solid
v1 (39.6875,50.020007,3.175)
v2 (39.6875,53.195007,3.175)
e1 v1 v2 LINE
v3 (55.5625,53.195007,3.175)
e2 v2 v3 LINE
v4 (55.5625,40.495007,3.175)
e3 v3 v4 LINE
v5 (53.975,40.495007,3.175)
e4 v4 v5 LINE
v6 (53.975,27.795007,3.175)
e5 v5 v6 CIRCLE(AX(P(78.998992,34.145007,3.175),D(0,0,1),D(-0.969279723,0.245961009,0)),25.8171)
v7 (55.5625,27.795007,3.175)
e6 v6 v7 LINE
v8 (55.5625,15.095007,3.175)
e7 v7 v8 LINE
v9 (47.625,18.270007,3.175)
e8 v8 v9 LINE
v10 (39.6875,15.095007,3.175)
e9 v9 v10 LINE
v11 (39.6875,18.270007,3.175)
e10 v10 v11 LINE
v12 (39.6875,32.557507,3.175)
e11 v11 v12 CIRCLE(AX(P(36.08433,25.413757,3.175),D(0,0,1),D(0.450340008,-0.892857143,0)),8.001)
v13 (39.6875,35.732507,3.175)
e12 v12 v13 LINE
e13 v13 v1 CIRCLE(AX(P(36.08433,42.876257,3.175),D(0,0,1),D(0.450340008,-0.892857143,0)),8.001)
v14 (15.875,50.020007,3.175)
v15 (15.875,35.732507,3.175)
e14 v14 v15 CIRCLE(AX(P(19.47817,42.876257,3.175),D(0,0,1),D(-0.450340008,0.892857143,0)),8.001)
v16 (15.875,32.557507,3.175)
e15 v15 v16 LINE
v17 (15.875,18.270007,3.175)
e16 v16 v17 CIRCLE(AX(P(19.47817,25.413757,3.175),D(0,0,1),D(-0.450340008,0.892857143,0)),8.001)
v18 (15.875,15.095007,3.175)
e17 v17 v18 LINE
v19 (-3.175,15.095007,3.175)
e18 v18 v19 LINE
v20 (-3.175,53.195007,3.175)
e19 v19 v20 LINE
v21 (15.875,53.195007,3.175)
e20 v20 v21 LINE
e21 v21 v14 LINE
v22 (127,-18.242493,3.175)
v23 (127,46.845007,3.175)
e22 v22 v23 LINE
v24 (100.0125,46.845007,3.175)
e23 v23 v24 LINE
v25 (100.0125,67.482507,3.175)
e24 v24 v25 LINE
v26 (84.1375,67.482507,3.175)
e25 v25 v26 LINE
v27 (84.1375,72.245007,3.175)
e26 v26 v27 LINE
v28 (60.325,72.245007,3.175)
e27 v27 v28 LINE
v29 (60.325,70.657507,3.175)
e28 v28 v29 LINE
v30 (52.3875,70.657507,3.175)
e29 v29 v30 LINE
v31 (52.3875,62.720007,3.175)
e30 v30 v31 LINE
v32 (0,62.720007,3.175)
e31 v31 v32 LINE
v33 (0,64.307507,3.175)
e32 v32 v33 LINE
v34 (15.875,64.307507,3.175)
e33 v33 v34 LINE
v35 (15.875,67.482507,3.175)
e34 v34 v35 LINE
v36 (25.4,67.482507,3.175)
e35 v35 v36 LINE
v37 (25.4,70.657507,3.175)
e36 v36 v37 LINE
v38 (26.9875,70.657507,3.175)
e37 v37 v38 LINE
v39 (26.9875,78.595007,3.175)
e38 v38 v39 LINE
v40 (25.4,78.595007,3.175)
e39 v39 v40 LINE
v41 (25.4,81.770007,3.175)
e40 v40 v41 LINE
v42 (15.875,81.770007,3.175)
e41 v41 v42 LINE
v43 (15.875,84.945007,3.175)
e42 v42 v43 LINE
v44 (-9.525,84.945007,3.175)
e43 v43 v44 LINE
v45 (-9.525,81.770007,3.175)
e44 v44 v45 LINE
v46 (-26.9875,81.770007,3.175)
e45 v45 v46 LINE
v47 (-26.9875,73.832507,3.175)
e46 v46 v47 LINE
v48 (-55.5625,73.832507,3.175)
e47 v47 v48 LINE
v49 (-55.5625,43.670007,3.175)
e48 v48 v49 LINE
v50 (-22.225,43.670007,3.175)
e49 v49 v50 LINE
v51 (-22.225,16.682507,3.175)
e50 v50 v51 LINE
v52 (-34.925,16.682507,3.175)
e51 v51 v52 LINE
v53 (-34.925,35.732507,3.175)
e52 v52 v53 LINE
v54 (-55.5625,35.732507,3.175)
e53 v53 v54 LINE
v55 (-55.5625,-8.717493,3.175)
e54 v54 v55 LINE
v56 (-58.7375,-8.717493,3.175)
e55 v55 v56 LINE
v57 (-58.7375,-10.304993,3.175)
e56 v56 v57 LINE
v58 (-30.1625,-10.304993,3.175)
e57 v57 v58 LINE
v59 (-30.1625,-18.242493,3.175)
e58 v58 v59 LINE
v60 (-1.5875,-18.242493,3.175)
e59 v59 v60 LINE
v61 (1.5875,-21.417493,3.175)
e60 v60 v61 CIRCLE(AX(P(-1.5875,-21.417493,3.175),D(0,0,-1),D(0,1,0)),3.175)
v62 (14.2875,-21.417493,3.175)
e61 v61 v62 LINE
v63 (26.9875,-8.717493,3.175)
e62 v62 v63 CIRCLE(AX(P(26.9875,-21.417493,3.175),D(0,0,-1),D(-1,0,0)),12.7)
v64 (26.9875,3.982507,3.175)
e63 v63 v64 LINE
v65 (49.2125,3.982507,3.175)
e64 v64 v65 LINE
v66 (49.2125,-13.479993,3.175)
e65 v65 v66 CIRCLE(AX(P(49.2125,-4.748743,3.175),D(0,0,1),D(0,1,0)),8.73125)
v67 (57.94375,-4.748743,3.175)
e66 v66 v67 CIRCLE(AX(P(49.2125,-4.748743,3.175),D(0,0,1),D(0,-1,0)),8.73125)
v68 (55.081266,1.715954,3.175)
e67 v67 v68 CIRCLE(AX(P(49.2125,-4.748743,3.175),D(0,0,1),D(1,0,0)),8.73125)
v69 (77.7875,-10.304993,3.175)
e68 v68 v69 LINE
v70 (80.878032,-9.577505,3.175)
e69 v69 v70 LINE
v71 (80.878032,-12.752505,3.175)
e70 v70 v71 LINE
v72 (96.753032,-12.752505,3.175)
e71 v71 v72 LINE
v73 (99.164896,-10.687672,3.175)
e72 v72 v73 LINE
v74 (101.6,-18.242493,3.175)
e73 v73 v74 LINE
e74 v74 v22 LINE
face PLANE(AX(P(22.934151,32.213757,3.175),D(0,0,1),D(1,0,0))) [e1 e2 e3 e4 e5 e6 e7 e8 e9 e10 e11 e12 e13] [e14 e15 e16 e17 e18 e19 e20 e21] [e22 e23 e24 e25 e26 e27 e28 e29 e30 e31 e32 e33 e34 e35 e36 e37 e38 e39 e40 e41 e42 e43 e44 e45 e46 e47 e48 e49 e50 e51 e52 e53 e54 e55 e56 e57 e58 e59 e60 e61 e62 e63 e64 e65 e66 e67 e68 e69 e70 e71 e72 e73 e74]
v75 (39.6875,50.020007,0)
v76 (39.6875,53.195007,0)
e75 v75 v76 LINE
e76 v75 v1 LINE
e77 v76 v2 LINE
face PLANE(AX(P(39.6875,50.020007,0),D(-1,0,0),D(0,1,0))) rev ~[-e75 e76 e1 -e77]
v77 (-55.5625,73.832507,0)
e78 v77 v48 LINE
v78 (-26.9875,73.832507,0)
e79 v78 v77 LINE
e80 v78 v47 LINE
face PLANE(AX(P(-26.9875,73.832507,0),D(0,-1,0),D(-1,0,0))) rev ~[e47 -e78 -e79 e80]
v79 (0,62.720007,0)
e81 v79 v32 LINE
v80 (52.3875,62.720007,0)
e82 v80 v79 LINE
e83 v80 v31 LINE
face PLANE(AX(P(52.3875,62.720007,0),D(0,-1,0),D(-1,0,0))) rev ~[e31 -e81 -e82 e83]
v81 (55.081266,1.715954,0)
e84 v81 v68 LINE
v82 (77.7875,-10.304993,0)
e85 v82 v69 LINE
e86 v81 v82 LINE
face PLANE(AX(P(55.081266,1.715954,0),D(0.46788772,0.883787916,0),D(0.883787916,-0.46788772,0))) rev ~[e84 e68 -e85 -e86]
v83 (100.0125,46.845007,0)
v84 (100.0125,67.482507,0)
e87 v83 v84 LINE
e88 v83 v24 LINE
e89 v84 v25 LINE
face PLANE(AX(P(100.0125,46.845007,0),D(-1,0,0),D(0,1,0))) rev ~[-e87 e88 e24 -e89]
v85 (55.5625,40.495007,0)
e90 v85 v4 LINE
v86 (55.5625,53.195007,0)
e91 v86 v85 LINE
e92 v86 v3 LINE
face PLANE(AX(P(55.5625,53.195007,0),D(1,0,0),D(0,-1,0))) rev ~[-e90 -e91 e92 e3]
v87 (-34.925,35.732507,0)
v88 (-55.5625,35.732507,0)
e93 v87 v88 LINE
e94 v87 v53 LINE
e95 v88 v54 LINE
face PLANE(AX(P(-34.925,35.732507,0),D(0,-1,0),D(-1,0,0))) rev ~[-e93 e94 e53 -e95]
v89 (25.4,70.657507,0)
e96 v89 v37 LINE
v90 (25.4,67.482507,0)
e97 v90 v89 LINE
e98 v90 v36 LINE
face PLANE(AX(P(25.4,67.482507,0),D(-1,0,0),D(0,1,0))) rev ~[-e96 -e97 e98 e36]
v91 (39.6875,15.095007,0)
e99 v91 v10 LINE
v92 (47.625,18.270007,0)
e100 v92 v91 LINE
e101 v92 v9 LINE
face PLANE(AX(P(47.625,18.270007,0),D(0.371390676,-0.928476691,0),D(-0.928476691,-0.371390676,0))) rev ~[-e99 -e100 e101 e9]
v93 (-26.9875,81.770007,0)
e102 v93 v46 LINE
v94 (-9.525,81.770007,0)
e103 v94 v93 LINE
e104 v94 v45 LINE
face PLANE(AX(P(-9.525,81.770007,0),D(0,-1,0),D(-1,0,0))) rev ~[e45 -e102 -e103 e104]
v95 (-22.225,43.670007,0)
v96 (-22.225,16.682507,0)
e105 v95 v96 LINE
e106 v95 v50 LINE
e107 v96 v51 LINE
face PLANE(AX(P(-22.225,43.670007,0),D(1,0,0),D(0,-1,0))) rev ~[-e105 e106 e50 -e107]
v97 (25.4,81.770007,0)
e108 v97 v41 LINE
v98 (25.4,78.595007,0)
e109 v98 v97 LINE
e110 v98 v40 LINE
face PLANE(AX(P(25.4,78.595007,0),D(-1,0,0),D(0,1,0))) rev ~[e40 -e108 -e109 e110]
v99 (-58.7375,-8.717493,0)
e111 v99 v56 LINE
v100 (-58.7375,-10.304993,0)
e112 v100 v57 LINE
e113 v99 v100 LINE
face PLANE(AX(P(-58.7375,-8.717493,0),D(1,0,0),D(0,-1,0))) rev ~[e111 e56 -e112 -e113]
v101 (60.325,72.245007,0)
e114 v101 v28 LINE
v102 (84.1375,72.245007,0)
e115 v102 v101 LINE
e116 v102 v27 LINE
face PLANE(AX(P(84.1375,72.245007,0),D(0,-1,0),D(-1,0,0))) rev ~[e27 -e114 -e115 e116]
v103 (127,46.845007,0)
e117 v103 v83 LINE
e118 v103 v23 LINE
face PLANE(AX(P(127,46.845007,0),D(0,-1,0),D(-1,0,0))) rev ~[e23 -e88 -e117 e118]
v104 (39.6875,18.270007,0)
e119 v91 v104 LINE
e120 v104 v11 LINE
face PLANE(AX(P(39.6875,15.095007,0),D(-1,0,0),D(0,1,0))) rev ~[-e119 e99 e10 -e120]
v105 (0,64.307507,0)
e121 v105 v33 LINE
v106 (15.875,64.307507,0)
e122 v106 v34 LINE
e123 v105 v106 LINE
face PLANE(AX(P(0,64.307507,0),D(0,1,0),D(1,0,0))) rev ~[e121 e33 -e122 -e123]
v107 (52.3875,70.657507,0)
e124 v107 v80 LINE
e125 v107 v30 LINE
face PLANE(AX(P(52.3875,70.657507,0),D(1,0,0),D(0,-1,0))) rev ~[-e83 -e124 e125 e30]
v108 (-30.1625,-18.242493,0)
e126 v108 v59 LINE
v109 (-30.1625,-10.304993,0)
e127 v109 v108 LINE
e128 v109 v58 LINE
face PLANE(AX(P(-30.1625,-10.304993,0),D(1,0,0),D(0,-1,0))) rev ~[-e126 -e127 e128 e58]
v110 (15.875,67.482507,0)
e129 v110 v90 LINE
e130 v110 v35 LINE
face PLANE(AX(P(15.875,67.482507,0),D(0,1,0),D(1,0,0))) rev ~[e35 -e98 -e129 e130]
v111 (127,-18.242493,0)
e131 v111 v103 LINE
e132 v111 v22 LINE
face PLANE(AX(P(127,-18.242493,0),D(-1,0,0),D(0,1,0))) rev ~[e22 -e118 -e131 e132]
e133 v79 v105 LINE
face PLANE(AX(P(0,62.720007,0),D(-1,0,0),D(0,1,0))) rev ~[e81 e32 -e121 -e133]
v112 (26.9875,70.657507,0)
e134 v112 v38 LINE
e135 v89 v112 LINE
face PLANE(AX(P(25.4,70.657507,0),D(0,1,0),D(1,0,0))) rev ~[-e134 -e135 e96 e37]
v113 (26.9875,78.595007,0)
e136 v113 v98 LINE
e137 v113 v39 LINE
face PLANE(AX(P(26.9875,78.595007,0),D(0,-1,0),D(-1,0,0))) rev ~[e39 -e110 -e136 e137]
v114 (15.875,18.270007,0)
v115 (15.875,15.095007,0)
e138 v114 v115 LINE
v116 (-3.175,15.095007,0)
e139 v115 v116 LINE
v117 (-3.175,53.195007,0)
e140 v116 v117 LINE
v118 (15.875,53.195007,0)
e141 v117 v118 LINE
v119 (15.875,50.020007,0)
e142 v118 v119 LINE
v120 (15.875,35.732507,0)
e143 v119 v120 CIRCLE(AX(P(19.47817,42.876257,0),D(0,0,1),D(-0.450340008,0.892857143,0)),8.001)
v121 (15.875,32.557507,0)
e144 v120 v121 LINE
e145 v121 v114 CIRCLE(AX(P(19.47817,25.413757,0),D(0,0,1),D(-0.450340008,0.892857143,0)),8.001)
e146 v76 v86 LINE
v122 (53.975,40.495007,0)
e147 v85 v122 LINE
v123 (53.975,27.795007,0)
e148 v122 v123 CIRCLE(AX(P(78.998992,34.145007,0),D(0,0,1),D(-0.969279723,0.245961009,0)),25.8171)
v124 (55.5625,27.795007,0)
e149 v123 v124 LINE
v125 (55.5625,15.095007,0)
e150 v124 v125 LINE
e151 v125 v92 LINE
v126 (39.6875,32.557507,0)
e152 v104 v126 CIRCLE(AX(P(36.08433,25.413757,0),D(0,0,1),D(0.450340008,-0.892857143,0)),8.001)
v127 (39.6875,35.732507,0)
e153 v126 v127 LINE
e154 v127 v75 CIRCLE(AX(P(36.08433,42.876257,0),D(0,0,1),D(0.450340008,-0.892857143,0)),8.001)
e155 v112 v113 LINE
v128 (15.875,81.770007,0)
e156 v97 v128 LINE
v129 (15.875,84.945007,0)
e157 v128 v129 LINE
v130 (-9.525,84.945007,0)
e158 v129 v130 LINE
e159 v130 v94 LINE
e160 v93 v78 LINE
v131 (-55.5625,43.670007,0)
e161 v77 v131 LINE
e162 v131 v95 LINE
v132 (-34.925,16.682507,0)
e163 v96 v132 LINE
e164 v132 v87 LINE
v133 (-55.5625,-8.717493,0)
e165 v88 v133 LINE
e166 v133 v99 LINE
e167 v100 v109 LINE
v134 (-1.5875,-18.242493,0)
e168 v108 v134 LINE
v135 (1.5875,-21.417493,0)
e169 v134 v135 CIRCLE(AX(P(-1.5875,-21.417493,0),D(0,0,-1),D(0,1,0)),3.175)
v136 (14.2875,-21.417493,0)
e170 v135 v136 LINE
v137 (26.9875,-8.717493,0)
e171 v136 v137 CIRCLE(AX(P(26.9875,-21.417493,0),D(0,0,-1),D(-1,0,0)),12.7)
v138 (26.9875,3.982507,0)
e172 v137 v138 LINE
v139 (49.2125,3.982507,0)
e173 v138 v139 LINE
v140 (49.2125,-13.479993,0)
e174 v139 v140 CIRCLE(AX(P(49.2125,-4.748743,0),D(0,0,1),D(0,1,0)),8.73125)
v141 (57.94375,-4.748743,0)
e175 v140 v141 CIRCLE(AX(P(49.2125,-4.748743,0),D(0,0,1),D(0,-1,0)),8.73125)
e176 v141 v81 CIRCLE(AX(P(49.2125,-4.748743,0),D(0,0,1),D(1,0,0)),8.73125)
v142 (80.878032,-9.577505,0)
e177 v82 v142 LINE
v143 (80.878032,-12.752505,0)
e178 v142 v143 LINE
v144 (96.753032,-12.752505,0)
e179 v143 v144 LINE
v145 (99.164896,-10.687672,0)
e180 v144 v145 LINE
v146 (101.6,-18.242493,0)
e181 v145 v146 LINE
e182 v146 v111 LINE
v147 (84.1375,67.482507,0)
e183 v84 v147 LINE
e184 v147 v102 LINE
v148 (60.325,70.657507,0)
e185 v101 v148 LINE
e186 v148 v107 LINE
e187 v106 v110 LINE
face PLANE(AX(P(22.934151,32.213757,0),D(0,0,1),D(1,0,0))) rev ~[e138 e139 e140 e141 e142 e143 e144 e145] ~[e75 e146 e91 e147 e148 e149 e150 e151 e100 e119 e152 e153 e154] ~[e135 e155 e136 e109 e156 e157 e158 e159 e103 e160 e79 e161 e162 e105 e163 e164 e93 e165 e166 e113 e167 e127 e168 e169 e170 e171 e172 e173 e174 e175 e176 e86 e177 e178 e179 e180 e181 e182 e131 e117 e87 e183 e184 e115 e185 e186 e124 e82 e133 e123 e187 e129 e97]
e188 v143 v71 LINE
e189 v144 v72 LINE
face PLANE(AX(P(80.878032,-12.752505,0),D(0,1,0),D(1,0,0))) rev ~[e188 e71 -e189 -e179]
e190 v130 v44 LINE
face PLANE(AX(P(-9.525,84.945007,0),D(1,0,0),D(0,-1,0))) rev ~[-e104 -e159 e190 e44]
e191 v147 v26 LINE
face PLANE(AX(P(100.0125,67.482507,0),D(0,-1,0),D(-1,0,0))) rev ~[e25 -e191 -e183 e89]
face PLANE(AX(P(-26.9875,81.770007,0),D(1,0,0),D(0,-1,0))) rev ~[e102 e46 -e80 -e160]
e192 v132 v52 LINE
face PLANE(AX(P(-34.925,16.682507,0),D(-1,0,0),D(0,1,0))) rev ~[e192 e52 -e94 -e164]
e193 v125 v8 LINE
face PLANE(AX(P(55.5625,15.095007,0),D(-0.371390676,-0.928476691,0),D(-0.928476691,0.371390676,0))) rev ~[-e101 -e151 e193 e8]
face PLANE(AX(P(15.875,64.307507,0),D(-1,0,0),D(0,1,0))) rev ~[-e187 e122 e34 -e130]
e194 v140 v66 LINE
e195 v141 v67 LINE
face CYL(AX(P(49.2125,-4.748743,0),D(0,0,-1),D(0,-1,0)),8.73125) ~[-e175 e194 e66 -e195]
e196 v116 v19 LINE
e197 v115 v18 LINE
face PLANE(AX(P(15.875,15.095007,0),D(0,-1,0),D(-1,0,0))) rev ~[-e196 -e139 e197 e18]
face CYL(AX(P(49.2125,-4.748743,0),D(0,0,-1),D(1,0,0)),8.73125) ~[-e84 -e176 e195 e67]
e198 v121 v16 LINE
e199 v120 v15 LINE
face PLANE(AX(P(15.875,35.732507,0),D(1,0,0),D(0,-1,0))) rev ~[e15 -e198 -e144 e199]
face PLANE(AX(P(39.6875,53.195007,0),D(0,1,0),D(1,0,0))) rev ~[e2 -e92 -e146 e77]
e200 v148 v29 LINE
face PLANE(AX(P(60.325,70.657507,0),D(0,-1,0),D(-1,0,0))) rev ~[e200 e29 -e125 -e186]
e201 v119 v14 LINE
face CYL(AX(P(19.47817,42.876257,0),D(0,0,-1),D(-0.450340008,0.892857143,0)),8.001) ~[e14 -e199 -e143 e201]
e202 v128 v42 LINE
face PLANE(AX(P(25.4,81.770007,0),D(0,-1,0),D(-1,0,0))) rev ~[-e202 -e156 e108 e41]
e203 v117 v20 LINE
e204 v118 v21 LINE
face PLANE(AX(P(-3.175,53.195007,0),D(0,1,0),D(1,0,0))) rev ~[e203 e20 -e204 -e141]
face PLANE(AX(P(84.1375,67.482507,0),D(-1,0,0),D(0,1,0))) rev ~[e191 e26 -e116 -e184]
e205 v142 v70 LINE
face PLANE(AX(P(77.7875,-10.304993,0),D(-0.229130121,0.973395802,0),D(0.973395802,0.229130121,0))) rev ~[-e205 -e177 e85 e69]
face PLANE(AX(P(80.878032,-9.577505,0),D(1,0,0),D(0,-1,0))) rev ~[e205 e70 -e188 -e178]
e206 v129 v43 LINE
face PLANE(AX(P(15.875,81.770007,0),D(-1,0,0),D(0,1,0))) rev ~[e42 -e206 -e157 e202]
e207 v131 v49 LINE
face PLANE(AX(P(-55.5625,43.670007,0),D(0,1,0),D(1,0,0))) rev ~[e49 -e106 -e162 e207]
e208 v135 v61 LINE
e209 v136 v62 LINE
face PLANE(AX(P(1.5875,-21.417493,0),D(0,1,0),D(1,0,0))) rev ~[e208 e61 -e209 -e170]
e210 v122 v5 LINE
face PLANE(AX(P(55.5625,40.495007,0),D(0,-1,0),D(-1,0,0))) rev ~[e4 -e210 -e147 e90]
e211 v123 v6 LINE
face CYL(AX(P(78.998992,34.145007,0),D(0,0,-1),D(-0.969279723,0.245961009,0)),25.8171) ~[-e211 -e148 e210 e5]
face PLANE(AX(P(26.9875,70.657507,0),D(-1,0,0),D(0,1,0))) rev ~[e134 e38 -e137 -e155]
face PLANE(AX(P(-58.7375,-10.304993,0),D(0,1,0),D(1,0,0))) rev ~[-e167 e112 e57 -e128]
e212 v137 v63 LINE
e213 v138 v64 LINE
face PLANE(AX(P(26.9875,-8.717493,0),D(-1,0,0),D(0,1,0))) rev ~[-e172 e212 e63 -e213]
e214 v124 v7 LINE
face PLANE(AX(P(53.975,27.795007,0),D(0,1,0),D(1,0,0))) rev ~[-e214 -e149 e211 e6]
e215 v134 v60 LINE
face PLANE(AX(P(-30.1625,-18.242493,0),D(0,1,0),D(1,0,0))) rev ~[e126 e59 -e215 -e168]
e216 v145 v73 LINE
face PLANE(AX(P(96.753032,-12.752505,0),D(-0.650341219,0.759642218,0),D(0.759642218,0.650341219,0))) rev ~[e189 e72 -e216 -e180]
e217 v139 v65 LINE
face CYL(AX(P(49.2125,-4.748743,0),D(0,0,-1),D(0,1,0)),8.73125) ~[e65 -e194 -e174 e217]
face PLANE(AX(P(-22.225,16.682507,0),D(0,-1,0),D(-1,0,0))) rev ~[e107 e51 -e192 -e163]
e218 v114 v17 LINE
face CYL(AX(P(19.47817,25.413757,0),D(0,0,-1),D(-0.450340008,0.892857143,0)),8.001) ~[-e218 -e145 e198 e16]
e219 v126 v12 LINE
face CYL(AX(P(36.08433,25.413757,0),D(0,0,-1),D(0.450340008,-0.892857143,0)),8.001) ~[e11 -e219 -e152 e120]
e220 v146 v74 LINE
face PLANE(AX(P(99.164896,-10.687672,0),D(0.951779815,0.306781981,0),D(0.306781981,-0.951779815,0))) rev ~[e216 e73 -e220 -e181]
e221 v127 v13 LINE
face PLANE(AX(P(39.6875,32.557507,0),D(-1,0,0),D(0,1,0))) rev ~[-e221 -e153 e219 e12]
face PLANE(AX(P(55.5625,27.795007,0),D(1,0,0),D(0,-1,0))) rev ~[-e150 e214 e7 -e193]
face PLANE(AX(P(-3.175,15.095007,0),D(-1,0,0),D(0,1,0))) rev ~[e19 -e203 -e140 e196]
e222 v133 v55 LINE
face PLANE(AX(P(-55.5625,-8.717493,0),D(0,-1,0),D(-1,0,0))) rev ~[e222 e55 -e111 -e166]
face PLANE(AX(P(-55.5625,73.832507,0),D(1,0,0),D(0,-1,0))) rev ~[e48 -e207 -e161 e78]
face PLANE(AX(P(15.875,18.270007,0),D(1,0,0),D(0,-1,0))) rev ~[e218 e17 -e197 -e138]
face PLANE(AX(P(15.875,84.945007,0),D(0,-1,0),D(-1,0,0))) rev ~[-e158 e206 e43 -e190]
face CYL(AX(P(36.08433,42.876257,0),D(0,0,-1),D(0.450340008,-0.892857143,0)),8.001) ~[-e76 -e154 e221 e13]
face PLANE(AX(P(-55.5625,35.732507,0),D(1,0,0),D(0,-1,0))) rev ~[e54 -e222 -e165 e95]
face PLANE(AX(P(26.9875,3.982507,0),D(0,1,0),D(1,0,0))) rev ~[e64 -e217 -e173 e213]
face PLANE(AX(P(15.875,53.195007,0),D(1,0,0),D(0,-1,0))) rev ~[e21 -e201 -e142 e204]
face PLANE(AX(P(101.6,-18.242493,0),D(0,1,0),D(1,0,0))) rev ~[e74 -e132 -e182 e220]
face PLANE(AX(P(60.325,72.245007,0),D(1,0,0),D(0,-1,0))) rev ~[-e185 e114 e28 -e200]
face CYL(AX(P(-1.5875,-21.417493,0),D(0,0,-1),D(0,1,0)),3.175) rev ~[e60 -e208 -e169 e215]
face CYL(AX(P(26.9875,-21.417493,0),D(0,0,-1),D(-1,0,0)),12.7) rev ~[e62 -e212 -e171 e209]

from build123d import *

# Parameters (mm, degrees)
F1_DEPTH = 3.175


# Not quite as in the source:
# - ends of sketch curves that miss each other by under 0.0002 mm in the source are joined


with BuildPart() as f1:
    # F0 (on Top) → F1 (new body)
    with BuildSketch(Plane.XY):
        with BuildLine():
            Line((-34.925, 35.7325066477), (-55.5625, 35.7325066477))
            Line((-55.5625, 35.7325066477), (-55.5625, -8.7174933523))
            Line((-55.5625, -8.7174933523), (-58.7375, -8.7174933523))
            Line((-58.7375, -8.7174933523), (-58.7375, -10.3049933523))
            Line((-58.7375, -10.3049933523), (-30.1625, -10.3049933523))
            Line((-30.1625, -10.3049933523), (-30.1625, -18.2424933523))
            Line((-30.1625, -18.2424933523), (-1.5875, -18.2424933523))
            ThreePointArc((-1.5875, -18.2424933523), (0.6575640303, -19.172429322), (1.5875, -21.4174933523))
            Line((1.5875, -21.4174933523), (14.2875, -21.4174933523))
            ThreePointArc((14.2875, -21.4174933523), (18.0072438789, -12.4372372312), (26.9875, -8.7174933523))
            Line((26.9875, -8.7174933523), (26.9875, 3.9825066477))
            Line((26.9875, 3.9825066477), (49.2125, 3.9825066477))
            ThreePointArc((49.2125, 3.9825066477), (52.3581189283, 3.3961819464), (55.0812659129, 1.7159541056))
            Line((55.0812659129, 1.7159541056), (77.7875, -10.3049933523))
            Line((77.7875, -10.3049933523), (80.8780316716, -9.5775052173))
            Line((80.8780316716, -9.5775052173), (80.8780316716, -12.7525052173))
            Line((80.8780316716, -12.7525052173), (96.7530316716, -12.7525052173))
            Line((96.7530316716, -12.7525052173), (99.1648957133, -10.6876718476))
            Line((99.1648957133, -10.6876718476), (101.6, -18.2424933523))
            Line((101.6, -18.2424933523), (104.775, -18.2424933523))
            Line((104.775, -18.2424933523), (119.0625, -18.2424933523))
            Line((119.0625, -18.2424933523), (127, -18.2424933523))
            Line((127, -18.2424933523), (127, 46.8450066477))
            Line((127, 46.8450066477), (100.0125, 46.8450066477))
            Line((100.0125, 46.8450066477), (100.0125, 67.4825066477))
            Line((100.0125, 67.4825066477), (84.1375, 67.4825066477))
            Line((84.1375, 67.4825066477), (84.1375, 72.2450066477))
            Line((84.1375, 72.2450066477), (66.675, 72.2450066477))
            Line((66.675, 72.2450066477), (60.325, 72.2450066477))
            Line((60.325, 72.2450066477), (60.325, 70.6575066477))
            Line((60.325, 70.6575066477), (52.3875, 70.6575066477))
            Line((52.3875, 70.6575066477), (52.3875, 62.7200066477))
            Line((52.3875, 62.7200066477), (0, 62.7200066477))
            Line((0, 62.7200066477), (0, 64.3075066477))
            Line((0, 64.3075066477), (15.875, 64.3075066477))
            Line((15.875, 64.3075066477), (15.875, 67.4825066477))
            Line((15.875, 67.4825066477), (25.4, 67.4825066477))
            Line((25.4, 67.4825066477), (25.4, 70.6575066477))
            Line((25.4, 70.6575066477), (26.9875, 70.6575066477))
            Line((26.9875, 70.6575066477), (26.9875, 78.5950066477))
            Line((26.9875, 78.5950066477), (25.4, 78.5950066477))
            Line((25.4, 78.5950066477), (25.4, 81.7700066477))
            Line((25.4, 81.7700066477), (15.875, 81.7700066477))
            Line((15.875, 81.7700066477), (15.875, 84.9450066477))
            Line((15.875, 84.9450066477), (-9.525, 84.9450066477))
            Line((-9.525, 84.9450066477), (-9.525, 81.7700066477))
            Line((-9.525, 81.7700066477), (-26.9875, 81.7700066477))
            Line((-26.9875, 81.7700066477), (-26.9875, 73.8325066477))
            Line((-26.9875, 73.8325066477), (-55.5625, 73.8325066477))
            Line((-55.5625, 73.8325066477), (-55.5625, 43.6700066477))
            Line((-55.5625, 43.6700066477), (-22.225, 43.6700066477))
            Line((-22.225, 43.6700066477), (-22.225, 16.6825066477))
            Line((-22.225, 16.6825066477), (-34.925, 16.6825066477))
            Line((-34.925, 16.6825066477), (-34.925, 35.7325066477))
        make_face()
        Polygon((-3.175, 53.1950066477), (15.875, 53.1950066477), (15.875, 50.0200066477), (15.875, 35.7325066477), (15.875, 32.5575066477), (15.875, 18.2700066477), (15.875, 15.0950066477), (-3.175, 15.0950066477), align=None, mode=Mode.SUBTRACT)
        Polygon((39.6875, 50.0200066477), (39.6875, 53.1950066477), (55.5625, 53.1950066477), (55.5625, 40.4950066477), (55.5625, 27.7950066477), (55.5625, 15.0950066477), (47.625, 18.2700066477), (39.6875, 15.0950066477), (39.6875, 18.2700066477), (39.6875, 32.5575066477), (39.6875, 35.7325066477), align=None, mode=Mode.SUBTRACT)
        with BuildLine():
            Line((15.875, 35.7325066477), (15.875, 50.0200066477))
            ThreePointArc((15.875, 50.0200066477), (11.4771704008, 42.8762566477), (15.875, 35.7325066477))
        make_face()
        with BuildLine():
            Line((15.875, 18.2700066477), (15.875, 32.5575066477))
            ThreePointArc((15.875, 32.5575066477), (11.4771704008, 25.4137566477), (15.875, 18.2700066477))
        make_face()
        with BuildLine():
            ThreePointArc((39.6875, 35.7325066477), (44.0853295992, 42.8762566477), (39.6875, 50.0200066477))
            Line((39.6875, 50.0200066477), (39.6875, 35.7325066477))
        make_face()
        with BuildLine():
            ThreePointArc((39.6875, 18.2700066477), (44.0853295992, 25.4137566477), (39.6875, 32.5575066477))
            Line((39.6875, 32.5575066477), (39.6875, 18.2700066477))
        make_face()
        with BuildLine():
            Line((55.5625, 27.7950066477), (55.5625, 40.4950066477))
            Line((55.5625, 40.4950066477), (53.975, 40.4950066477))
            ThreePointArc((53.975, 40.4950066477), (53.1818915421, 34.1450066477), (53.975, 27.7950066477))
            Line((53.975, 27.7950066477), (55.5625, 27.7950066477))
        make_face()
        with BuildLine():
            ThreePointArc((55.0812659129, 1.7159541056), (52.3581189283, 3.3961819464), (49.2125, 3.9825066477))
            Line((49.2125, 3.9825066477), (49.2125, -13.4799933523))
            ThreePointArc((49.2125, -13.4799933523), (55.3864260832, -10.9226694355), (57.94375, -4.7487433523))
            ThreePointArc((57.94375, -4.7487433523), (57.1961203861, -1.2136999165), (55.0812659129, 1.7159541056))
        make_face()
        with BuildLine():
            Line((49.2125, -13.4799933523), (49.2125, 3.9825066477))
            ThreePointArc((49.2125, 3.9825066477), (40.48125, -4.7487433523), (49.2125, -13.4799933523))
        make_face()
    extrude(amount=F1_DEPTH)


solid = f1.part
